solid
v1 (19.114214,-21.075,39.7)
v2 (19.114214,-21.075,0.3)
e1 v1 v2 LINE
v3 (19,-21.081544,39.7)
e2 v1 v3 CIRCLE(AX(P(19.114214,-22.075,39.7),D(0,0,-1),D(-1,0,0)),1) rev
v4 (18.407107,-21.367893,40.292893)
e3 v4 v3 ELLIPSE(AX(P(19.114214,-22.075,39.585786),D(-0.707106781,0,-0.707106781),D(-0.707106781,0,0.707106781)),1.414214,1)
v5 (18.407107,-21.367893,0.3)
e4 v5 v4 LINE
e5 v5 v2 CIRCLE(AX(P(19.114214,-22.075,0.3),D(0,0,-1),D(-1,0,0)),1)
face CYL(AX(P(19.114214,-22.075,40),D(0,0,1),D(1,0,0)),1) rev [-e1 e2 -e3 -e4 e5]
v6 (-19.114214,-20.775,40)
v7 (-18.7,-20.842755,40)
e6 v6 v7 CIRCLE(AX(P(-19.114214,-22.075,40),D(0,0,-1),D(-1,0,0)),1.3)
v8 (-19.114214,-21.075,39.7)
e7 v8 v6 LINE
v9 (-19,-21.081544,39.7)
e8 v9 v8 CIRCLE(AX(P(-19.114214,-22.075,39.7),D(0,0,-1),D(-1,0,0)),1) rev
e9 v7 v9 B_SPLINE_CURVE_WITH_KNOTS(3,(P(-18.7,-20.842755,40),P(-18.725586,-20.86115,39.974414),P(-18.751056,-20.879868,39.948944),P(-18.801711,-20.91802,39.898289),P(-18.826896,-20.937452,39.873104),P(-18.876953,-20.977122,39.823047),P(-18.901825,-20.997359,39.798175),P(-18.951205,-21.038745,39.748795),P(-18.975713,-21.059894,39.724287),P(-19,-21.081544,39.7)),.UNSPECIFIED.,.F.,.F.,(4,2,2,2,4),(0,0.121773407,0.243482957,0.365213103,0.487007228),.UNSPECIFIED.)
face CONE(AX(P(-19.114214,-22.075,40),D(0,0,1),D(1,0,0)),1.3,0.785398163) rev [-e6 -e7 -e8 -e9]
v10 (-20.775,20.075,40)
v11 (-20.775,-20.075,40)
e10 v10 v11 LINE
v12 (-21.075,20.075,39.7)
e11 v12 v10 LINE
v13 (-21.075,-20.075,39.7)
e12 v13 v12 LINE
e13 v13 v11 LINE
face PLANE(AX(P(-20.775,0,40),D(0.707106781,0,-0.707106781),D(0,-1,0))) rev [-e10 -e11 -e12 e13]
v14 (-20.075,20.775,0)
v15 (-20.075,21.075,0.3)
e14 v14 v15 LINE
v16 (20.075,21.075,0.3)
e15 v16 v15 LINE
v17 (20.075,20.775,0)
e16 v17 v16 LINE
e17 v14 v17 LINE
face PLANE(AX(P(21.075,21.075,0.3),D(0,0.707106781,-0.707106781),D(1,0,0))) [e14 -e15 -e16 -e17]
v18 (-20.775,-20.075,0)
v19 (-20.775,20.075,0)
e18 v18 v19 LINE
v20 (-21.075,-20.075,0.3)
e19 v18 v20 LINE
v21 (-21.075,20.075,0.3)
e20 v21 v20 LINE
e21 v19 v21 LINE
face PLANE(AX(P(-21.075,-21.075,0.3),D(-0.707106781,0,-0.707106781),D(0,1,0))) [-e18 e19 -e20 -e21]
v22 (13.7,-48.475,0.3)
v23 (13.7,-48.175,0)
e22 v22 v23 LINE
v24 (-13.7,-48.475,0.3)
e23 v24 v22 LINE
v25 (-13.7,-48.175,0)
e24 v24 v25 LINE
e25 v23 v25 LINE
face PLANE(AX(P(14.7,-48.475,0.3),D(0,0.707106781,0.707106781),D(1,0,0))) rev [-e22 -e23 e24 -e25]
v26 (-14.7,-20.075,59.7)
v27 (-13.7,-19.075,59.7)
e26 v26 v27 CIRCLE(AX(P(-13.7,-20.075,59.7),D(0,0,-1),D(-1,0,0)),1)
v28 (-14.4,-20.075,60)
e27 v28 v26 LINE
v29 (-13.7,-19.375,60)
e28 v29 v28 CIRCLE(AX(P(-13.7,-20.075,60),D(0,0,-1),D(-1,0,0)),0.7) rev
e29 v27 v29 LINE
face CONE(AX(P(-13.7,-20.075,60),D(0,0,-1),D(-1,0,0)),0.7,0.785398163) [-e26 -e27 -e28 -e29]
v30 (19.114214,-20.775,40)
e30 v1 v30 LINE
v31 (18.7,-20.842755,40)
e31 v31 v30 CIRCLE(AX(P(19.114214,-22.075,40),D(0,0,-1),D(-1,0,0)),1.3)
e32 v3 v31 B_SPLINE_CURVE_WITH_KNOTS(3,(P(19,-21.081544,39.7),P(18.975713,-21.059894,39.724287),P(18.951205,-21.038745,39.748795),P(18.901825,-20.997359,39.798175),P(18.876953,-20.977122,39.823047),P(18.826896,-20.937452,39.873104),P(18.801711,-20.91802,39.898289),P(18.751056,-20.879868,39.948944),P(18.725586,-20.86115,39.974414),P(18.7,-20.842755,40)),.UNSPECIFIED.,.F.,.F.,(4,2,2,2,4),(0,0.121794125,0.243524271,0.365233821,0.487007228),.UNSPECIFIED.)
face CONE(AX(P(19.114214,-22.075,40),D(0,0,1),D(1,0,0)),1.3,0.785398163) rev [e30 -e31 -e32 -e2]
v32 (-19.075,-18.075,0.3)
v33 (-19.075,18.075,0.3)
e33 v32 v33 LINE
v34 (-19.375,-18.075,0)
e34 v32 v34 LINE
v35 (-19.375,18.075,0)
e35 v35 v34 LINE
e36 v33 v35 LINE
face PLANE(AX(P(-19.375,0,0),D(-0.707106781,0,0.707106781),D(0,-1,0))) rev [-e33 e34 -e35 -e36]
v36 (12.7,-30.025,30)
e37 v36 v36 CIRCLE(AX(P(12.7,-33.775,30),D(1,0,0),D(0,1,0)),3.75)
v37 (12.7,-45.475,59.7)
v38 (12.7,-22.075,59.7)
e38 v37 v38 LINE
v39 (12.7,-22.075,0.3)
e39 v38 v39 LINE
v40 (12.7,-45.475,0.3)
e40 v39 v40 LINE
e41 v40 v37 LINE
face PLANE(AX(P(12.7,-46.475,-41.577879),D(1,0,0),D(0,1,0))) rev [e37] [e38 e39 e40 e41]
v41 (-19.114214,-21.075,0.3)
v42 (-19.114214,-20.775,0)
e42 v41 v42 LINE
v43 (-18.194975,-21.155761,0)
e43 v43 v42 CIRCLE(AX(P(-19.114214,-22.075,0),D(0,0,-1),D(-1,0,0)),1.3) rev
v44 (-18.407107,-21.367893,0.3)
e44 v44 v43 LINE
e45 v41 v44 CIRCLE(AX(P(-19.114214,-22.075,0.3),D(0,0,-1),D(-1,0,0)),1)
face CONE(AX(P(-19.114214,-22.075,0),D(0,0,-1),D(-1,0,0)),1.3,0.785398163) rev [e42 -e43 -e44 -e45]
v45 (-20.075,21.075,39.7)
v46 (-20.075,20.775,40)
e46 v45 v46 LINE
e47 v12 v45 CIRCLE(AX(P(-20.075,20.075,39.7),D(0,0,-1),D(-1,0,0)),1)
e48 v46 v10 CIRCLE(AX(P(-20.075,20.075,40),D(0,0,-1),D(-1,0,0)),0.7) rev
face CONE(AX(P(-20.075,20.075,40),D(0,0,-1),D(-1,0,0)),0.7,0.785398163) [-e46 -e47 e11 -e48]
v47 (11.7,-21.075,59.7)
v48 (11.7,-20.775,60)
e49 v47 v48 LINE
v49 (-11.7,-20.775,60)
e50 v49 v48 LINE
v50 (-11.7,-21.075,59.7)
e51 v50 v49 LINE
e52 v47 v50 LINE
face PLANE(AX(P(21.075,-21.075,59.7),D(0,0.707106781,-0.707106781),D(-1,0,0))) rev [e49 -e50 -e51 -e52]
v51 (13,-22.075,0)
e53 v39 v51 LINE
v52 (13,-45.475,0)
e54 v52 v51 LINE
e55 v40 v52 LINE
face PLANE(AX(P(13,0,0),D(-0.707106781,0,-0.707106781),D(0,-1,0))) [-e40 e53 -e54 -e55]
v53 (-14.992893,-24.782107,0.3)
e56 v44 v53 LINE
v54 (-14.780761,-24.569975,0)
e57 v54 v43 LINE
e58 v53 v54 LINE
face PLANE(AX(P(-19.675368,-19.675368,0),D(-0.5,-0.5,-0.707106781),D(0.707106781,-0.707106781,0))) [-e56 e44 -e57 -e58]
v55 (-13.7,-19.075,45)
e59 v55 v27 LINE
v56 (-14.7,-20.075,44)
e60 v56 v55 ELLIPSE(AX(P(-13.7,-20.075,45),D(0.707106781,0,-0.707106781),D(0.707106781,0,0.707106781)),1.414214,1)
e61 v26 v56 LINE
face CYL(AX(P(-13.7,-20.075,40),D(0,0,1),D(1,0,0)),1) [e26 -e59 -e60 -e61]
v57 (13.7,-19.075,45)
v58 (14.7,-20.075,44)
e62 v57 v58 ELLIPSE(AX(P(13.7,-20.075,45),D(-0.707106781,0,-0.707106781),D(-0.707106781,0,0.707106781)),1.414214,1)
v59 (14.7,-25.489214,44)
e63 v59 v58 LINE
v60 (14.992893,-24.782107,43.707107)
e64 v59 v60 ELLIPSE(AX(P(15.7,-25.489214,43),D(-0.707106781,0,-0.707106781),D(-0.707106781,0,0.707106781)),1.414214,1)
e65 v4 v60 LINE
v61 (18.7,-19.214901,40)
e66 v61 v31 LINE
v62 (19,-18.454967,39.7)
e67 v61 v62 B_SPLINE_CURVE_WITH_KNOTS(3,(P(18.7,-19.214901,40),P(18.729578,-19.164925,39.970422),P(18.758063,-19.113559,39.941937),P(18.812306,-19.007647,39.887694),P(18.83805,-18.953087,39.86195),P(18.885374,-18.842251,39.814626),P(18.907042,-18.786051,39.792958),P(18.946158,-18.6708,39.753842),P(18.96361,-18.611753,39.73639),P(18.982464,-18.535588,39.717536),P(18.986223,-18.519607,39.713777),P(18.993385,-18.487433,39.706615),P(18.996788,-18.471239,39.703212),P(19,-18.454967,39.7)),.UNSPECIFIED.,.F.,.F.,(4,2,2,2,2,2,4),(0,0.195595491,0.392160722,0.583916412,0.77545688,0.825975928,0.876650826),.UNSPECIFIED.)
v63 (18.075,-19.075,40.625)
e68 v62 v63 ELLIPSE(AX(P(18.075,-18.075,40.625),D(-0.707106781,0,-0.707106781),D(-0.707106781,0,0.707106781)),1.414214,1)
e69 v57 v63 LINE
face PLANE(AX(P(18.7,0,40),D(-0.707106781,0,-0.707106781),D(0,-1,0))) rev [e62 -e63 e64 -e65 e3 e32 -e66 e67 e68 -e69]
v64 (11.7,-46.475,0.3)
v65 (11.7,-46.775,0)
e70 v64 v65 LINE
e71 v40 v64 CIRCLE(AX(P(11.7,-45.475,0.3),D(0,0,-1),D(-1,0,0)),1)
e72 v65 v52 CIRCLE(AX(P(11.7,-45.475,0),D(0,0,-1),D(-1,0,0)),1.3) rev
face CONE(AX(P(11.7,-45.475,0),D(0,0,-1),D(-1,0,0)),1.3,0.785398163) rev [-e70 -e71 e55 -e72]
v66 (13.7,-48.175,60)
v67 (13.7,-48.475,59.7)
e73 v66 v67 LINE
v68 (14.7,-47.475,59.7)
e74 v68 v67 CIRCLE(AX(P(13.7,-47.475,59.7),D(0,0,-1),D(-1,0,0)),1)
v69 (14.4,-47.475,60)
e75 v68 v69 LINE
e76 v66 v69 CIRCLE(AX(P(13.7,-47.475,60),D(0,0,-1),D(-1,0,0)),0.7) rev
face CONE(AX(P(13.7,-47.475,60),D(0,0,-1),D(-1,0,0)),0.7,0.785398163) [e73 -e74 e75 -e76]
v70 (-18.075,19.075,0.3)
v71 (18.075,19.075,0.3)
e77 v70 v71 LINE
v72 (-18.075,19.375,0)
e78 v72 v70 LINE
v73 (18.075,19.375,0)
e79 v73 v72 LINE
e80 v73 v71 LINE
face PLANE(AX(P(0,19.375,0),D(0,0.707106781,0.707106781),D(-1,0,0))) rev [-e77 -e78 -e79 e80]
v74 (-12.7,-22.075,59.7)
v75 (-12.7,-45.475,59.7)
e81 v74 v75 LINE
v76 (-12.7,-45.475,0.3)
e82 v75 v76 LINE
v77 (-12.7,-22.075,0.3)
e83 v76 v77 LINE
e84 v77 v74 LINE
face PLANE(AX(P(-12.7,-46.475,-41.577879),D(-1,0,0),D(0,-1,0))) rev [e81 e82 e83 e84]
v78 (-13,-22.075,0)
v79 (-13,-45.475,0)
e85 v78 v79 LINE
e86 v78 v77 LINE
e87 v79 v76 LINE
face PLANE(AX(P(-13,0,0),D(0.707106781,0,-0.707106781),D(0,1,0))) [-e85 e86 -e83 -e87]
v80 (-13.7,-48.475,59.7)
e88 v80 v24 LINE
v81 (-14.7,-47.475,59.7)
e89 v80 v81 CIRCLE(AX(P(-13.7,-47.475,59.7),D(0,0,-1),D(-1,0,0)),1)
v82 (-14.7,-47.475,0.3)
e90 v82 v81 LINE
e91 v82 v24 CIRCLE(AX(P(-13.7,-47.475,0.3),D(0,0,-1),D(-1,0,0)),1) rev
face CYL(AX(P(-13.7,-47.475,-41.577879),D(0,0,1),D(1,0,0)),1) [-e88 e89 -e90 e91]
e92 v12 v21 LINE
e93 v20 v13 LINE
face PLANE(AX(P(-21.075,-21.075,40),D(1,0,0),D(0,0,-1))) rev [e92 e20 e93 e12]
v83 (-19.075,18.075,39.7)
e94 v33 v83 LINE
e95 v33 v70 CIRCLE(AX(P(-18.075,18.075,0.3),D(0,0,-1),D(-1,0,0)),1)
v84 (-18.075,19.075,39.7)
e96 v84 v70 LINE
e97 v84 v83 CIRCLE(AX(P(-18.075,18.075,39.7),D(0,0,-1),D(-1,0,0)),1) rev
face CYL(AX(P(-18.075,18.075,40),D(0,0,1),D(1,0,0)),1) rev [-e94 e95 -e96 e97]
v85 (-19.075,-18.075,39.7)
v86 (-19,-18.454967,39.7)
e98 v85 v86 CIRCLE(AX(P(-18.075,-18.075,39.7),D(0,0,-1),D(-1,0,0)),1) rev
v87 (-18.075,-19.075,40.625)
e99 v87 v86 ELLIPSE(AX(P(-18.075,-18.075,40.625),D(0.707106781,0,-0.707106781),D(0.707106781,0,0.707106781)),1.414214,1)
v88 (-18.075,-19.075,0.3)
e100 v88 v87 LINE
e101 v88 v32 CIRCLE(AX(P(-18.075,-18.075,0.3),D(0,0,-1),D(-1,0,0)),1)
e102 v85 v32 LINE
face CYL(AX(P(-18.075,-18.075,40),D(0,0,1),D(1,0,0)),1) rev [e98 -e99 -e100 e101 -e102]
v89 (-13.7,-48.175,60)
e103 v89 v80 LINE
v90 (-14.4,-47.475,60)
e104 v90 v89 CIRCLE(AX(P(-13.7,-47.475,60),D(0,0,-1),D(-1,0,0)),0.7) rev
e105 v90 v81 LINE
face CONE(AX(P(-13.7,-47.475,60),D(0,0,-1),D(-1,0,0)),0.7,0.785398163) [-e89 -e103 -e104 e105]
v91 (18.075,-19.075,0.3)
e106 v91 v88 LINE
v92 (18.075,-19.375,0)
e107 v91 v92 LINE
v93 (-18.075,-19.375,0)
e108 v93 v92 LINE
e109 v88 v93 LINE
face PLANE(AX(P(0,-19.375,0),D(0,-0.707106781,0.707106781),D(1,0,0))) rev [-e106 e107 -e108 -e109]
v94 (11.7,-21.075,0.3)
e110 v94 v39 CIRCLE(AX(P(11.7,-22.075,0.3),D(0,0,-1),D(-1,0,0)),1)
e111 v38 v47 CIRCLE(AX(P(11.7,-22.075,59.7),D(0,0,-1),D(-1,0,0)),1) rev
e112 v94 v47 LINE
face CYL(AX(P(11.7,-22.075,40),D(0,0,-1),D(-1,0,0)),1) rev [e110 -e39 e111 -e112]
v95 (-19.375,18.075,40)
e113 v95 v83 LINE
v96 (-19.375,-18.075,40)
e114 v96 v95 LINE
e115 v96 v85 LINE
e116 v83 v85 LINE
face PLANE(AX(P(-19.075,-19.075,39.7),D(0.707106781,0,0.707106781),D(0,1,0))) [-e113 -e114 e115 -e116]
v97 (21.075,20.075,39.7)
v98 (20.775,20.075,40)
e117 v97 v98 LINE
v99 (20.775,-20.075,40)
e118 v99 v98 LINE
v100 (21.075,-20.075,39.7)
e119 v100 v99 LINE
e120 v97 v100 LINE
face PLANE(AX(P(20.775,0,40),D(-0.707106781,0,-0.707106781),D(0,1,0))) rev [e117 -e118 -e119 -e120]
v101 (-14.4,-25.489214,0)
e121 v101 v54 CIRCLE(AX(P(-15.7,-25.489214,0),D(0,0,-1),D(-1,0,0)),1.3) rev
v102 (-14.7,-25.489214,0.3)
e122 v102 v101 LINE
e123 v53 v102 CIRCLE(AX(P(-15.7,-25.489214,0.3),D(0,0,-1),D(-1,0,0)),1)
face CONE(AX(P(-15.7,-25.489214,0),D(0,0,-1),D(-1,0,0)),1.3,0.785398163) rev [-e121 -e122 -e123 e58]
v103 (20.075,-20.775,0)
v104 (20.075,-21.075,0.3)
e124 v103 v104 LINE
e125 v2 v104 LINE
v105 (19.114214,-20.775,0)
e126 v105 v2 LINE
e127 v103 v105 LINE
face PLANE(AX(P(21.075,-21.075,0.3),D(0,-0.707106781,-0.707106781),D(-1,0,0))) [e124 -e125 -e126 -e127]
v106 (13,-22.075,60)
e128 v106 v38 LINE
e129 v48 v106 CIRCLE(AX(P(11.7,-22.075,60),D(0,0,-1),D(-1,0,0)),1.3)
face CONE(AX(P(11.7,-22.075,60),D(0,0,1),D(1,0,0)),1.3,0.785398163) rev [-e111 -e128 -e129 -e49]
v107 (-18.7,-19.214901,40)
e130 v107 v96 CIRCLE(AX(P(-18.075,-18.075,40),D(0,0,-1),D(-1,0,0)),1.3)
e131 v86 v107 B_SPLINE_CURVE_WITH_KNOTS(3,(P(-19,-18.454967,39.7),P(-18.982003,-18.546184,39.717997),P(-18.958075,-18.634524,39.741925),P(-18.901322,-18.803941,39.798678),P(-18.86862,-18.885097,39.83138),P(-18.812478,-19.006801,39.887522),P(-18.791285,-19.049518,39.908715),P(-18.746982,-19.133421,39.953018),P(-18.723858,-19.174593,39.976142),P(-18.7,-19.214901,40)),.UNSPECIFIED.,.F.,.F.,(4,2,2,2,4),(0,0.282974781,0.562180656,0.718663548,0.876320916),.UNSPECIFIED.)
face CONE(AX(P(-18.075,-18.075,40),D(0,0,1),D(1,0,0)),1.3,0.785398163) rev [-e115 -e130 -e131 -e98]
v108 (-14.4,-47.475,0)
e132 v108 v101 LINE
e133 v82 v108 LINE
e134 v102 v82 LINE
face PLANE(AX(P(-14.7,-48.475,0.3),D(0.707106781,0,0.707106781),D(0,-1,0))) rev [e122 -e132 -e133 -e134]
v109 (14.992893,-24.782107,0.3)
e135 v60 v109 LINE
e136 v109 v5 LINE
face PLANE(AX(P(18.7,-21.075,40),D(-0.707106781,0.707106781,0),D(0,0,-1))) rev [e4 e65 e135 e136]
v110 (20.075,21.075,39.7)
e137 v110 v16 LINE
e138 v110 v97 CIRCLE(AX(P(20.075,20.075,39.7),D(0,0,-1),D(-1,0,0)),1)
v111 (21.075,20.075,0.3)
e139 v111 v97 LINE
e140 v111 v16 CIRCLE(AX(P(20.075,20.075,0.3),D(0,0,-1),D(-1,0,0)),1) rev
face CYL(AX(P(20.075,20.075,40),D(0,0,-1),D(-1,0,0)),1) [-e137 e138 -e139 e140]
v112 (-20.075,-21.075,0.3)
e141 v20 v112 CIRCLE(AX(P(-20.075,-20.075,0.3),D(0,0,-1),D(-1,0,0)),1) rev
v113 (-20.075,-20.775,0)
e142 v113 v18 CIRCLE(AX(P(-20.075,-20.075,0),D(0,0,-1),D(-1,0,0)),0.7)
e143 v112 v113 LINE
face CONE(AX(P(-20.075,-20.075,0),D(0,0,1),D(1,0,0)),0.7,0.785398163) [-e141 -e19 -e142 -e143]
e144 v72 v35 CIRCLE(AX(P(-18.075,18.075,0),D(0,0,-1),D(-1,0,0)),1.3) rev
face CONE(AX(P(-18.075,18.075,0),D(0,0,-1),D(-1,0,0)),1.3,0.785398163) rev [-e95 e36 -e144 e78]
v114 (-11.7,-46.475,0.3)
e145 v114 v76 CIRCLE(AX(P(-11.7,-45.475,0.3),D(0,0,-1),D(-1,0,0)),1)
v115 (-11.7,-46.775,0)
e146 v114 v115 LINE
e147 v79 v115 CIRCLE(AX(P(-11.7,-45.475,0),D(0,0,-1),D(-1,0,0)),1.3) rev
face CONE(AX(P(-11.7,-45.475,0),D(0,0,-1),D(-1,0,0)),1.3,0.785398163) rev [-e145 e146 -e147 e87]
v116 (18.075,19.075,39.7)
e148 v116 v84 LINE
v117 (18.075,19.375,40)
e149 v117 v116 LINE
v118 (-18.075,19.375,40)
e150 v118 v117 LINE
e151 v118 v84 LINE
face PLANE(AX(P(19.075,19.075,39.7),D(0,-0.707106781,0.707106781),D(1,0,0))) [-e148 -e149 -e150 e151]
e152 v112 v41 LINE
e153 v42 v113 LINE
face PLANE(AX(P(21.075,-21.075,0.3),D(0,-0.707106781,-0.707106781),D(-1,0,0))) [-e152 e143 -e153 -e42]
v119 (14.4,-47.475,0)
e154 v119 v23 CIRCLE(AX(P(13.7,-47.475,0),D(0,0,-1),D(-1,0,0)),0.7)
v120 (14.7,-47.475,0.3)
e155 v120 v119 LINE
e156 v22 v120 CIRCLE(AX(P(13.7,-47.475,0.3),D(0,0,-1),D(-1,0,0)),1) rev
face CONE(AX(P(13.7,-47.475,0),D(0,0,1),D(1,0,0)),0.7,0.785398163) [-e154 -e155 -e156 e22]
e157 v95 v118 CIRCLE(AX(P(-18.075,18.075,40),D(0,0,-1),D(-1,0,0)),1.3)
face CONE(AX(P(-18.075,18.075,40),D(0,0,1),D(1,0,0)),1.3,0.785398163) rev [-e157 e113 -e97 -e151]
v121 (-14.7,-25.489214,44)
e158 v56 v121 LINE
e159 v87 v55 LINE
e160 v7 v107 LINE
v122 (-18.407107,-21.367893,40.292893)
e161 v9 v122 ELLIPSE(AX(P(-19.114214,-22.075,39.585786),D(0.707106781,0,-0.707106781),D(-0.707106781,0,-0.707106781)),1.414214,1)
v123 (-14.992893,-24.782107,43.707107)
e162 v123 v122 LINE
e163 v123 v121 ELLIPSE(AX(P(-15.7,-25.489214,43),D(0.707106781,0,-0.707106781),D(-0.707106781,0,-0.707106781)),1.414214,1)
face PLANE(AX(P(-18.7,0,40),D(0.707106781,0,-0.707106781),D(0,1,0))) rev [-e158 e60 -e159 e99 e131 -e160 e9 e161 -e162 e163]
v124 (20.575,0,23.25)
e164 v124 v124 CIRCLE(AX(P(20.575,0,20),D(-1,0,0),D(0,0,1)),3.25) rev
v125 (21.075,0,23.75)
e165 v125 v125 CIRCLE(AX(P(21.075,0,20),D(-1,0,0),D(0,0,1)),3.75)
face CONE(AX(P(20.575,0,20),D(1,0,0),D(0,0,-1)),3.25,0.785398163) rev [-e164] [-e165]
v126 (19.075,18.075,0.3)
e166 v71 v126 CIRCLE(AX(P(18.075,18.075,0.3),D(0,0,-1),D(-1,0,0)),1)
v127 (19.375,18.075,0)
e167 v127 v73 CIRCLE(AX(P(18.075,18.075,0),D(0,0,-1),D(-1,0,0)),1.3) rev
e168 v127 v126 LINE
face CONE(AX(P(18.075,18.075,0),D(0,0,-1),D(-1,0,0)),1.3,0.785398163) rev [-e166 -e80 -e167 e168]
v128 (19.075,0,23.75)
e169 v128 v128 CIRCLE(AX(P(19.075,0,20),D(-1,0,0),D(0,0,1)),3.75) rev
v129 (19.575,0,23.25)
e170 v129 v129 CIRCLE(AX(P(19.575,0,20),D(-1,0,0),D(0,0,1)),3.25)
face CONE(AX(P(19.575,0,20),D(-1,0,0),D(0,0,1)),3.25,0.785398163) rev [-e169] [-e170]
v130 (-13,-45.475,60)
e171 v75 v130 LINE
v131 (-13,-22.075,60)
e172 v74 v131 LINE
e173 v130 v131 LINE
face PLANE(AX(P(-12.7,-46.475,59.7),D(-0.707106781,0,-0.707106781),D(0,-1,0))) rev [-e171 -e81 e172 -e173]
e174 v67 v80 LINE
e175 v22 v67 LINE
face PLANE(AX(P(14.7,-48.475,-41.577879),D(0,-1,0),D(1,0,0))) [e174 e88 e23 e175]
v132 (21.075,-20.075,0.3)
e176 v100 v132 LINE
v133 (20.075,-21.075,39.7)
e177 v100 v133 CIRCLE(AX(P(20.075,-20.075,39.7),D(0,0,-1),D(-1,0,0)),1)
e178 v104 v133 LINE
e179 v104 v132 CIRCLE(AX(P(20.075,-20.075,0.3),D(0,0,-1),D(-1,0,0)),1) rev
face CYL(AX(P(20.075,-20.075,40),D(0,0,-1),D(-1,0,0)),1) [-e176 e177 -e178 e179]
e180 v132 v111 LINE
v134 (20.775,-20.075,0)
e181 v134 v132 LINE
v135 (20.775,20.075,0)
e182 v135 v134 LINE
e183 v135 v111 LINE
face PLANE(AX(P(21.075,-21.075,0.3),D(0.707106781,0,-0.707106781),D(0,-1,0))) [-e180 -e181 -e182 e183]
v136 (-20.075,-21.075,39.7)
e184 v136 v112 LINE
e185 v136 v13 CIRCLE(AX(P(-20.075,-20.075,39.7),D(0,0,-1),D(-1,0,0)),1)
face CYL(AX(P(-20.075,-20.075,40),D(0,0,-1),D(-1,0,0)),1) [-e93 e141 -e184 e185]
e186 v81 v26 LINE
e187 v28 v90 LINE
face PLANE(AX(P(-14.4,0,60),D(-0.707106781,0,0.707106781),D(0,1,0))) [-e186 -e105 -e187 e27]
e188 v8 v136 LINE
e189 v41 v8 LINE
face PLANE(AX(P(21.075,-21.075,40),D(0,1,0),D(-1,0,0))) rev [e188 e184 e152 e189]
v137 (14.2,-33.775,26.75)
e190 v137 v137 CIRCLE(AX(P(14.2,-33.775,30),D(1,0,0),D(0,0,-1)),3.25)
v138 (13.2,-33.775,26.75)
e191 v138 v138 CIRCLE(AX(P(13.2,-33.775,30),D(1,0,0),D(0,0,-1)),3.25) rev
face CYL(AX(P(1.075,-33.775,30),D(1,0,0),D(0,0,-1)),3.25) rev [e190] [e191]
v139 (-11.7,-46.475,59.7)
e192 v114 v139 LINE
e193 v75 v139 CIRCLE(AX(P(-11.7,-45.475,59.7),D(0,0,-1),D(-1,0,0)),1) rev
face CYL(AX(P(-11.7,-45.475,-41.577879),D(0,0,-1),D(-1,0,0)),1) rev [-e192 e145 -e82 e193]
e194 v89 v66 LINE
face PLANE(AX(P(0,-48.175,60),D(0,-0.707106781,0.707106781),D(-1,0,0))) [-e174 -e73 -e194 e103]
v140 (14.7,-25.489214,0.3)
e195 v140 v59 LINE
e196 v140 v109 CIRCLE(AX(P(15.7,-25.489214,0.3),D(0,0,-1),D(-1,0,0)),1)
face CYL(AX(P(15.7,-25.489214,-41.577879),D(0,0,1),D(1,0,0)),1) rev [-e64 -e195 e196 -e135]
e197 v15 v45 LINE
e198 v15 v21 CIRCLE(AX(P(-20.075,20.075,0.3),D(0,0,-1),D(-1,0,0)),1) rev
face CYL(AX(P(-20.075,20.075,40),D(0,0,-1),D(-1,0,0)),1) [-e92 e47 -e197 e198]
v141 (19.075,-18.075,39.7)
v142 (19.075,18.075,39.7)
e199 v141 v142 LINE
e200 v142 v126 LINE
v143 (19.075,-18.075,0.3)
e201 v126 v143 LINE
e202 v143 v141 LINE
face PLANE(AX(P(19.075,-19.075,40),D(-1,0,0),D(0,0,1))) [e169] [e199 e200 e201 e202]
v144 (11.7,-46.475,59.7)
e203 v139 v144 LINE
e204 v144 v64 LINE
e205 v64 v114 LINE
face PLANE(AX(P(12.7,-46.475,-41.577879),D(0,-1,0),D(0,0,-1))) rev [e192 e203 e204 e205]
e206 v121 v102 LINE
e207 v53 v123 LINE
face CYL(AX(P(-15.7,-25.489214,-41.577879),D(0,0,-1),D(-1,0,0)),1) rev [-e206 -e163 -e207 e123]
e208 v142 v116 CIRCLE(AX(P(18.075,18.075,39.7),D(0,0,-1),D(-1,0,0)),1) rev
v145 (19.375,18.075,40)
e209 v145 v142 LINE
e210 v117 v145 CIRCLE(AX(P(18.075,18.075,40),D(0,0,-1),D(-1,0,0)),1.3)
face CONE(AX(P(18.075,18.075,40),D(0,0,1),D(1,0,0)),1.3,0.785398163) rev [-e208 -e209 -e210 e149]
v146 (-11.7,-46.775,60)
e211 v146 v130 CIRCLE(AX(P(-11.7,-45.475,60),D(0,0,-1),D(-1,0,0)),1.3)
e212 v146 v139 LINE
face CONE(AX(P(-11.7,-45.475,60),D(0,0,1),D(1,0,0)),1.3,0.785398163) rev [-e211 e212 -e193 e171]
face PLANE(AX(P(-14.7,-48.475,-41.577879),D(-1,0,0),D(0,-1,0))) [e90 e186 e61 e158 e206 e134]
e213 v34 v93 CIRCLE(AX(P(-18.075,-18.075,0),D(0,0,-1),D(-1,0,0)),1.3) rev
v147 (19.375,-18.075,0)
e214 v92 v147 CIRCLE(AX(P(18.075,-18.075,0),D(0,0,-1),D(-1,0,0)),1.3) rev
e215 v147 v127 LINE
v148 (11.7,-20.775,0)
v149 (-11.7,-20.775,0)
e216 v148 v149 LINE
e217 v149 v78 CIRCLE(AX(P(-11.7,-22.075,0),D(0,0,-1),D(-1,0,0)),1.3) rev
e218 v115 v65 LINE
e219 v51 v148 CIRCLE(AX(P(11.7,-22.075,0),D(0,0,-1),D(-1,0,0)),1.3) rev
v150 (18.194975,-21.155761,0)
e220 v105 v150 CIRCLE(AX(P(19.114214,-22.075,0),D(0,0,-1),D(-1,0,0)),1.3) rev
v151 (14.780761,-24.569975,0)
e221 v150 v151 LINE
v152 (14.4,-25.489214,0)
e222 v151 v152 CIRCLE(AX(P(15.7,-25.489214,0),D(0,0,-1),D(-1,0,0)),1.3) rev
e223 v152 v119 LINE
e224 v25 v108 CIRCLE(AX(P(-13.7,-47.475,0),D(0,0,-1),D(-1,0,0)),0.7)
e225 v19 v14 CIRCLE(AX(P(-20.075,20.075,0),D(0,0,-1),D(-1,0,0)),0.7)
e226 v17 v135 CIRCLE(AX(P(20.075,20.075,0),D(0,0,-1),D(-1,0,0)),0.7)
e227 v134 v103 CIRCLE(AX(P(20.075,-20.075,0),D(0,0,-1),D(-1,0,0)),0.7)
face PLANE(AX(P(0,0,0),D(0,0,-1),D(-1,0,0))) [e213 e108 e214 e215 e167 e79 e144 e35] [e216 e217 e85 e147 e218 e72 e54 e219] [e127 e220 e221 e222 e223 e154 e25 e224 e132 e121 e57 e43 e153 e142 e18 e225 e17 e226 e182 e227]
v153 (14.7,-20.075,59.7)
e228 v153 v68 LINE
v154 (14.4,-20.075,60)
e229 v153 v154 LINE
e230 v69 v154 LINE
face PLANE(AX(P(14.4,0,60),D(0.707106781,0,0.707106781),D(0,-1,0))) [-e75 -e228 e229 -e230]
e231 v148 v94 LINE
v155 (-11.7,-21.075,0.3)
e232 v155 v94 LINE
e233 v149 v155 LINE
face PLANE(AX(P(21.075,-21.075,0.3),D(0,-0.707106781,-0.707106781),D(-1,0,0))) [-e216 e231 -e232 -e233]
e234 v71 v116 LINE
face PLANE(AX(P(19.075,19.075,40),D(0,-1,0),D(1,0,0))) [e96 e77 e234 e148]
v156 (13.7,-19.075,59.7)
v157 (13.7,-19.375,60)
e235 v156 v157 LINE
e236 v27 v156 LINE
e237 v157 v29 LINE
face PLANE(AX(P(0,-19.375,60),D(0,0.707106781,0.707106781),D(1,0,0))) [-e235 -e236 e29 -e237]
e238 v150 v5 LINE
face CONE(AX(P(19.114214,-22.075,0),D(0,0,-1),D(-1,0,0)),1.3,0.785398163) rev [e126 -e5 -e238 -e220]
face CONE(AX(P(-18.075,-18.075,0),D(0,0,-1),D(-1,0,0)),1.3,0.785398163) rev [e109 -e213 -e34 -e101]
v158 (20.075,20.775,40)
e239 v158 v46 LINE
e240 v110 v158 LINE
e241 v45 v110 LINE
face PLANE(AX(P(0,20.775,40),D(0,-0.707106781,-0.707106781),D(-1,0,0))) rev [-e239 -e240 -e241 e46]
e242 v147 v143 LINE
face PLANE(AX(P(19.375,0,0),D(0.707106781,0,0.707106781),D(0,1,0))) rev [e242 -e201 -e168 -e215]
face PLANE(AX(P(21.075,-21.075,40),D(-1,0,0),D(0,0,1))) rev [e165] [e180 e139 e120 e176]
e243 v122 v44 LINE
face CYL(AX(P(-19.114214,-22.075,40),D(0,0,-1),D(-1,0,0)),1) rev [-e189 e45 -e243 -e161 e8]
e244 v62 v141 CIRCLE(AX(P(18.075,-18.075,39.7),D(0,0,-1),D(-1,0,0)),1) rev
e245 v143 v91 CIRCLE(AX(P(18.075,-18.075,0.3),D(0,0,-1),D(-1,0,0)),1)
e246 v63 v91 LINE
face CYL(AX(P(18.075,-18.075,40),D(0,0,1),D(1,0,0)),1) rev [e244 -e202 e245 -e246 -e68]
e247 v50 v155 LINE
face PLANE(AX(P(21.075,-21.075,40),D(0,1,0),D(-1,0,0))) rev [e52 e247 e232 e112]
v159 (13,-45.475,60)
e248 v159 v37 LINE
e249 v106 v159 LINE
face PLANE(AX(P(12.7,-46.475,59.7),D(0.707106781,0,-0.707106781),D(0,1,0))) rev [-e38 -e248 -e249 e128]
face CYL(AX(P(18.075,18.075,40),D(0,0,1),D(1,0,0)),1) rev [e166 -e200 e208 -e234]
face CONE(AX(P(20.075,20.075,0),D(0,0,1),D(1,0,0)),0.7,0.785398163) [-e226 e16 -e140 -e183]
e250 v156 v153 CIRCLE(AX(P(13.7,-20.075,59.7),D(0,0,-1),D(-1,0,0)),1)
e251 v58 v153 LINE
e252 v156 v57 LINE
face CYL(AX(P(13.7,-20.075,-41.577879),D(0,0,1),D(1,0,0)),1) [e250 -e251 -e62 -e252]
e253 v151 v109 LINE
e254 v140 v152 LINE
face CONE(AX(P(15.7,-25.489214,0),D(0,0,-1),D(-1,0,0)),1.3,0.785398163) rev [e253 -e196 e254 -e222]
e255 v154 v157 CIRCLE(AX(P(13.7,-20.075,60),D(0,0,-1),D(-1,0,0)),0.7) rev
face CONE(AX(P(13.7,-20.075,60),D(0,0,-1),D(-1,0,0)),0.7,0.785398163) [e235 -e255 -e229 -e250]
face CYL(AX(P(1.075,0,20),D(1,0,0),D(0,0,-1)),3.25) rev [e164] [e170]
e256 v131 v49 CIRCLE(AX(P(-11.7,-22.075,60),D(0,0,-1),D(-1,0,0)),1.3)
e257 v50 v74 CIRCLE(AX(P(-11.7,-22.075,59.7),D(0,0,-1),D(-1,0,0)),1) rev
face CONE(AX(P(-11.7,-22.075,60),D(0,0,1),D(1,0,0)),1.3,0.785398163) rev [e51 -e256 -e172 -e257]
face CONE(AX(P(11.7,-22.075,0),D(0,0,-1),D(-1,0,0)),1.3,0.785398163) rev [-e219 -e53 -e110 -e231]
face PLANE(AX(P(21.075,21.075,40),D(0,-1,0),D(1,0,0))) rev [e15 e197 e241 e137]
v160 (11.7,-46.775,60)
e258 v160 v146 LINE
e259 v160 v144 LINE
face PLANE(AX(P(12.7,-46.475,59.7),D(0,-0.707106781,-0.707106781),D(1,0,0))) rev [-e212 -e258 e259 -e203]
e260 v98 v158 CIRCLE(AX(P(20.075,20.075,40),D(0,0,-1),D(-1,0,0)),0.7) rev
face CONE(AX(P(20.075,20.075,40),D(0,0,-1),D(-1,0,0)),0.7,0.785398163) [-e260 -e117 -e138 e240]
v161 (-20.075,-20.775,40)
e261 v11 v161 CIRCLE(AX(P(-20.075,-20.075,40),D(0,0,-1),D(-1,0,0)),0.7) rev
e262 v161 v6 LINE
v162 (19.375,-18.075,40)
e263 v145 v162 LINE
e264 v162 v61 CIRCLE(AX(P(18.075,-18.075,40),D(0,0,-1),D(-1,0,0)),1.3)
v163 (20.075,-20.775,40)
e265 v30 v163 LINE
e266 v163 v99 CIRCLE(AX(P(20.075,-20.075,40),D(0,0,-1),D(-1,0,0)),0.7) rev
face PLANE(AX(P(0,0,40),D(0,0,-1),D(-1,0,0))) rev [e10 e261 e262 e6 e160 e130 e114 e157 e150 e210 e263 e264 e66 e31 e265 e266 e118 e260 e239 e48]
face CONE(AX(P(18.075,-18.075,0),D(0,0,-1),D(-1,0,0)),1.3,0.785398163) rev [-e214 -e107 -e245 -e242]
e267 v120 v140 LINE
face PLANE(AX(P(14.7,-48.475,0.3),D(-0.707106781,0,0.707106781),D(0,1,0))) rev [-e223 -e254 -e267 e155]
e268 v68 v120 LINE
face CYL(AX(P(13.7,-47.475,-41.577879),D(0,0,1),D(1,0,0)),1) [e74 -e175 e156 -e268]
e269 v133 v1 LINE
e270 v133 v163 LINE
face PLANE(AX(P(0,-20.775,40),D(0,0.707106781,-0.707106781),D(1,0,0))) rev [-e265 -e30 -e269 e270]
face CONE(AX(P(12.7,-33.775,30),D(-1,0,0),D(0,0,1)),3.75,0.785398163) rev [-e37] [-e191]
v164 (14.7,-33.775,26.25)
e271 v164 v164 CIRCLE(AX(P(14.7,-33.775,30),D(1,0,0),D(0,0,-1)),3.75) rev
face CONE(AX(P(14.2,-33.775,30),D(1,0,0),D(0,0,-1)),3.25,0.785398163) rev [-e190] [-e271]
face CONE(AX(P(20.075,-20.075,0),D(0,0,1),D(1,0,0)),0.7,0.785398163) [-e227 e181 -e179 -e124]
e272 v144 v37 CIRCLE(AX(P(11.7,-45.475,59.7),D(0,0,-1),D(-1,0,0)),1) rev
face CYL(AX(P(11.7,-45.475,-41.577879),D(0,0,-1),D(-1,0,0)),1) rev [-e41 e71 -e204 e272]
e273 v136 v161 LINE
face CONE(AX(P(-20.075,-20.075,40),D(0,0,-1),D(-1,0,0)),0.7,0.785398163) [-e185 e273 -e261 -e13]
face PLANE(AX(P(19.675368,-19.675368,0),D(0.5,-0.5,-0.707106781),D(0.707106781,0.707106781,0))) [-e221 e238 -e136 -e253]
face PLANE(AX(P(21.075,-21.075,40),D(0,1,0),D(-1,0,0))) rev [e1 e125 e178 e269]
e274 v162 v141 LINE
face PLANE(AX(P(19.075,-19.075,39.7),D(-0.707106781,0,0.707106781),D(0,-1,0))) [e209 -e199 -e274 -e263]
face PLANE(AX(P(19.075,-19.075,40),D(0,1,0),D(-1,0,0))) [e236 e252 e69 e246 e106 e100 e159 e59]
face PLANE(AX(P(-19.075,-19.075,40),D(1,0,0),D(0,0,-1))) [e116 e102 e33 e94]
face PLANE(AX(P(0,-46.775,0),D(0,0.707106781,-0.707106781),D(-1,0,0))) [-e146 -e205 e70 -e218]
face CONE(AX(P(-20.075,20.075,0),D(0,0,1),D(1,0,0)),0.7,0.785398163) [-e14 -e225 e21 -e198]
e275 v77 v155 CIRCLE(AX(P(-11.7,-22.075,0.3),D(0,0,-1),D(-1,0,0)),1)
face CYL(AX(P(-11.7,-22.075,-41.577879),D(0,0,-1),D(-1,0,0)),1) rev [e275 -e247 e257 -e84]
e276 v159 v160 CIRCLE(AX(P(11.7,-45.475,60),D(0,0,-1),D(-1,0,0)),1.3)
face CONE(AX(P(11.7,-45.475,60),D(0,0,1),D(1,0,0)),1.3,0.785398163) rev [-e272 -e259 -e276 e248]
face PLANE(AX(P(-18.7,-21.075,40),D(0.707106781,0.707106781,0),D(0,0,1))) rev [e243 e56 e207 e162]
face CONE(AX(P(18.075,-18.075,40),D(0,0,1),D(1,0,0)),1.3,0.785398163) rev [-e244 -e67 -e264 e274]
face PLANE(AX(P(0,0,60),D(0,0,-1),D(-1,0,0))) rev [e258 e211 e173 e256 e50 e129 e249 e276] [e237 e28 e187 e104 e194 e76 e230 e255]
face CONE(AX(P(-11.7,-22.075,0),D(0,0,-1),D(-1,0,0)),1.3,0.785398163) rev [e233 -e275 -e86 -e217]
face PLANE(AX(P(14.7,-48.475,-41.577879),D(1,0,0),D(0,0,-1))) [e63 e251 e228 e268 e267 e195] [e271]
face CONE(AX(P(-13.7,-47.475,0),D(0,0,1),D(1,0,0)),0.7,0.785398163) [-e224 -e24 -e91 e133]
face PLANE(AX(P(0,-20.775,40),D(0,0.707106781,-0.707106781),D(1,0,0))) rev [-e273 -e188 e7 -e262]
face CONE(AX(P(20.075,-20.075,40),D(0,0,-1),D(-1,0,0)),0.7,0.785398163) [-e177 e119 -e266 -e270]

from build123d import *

# Parameters (mm, degrees)
SKETCH1_W           = 42.15
SKETCH1_H           = 42.15
SKETCH1_W_2         = 38.15
SKETCH1_H_2         = 38.15
BOSS_EXTRUDE1_DEPTH = 40
BOSS_EXTRUDE2_START = -40
SKETCH3_W           = 29.4
SKETCH3_H           = 29.4
SKETCH3_W_2         = 25.4
SKETCH3_H_2         = 25.4
BOSS_EXTRUDE2_DEPTH = 60
CHAMFER1_SIZE       = 4
FILLET1_R           = 1
CHAMFER2_SIZE       = 0.3
SKETCH6_R           = 3.25
CUT_EXTRUDE1_DEPTH  = 20
CHAMFER3_SIZE       = 0.5


with BuildPart() as part:
    # Sketch1 → Boss-Extrude1 (new body)
    with BuildSketch(Plane.XY):
        Rectangle(SKETCH1_W, SKETCH1_H)
        Rectangle(SKETCH1_W_2, SKETCH1_H_2, mode=Mode.SUBTRACT)
    extrude(amount=BOSS_EXTRUDE1_DEPTH)

    # Sketch3 → Boss-Extrude2 (add)
    with BuildSketch(Plane.XY.offset(40).offset(BOSS_EXTRUDE2_START)):
        with Locations((0, -33.775)):
            Rectangle(SKETCH3_W, SKETCH3_H)
        with Locations((0, -33.775)):
            Rectangle(SKETCH3_W_2, SKETCH3_H_2, mode=Mode.SUBTRACT)
    extrude(amount=BOSS_EXTRUDE2_DEPTH)

    # Chamfer1
    chamfer1_edges = [part.edges().sort_by_distance(p)[0] for p in [
        (-14.7, -21.075, 20),
        (-14.7, -20.075, 40),
        (14.7, -20.075, 40),
        (14.7, -21.075, 20),
    ]]
    chamfer(chamfer1_edges, length=CHAMFER1_SIZE)

    # Fillet1
    # the kernel refuses this fillet: 1 mm, written as the material it adds along each edge
    with BuildSketch(Plane(origin=(-18.7, -21.075, 41.035533906), x_dir=(-1, 0, 0), z_dir=(0, 0, -1))) as fillet1_piece_1_section:
        with BuildLine():
            CenterArc((FILLET1_R * 0.414213562373, -FILLET1_R), FILLET1_R, 90, 45)
            Line((-FILLET1_R * 0.292893218813, -FILLET1_R * 0.292893218813), (0, 0))
            Line((0, 0), (FILLET1_R * 0.414213562373, 0))
        make_face()
    fillet1_piece_1 = extrude(amount=41.035533906, mode=Mode.PRIVATE)
    fillet1_piece_1 = split(fillet1_piece_1, bisect_by=Plane(origin=(-18.52848767, -21.244019164, 40), z_dir=(0, 0, 1)), keep=Keep.TOP, mode=Mode.PRIVATE)
    fillet1_piece_1 = split(fillet1_piece_1, bisect_by=Plane(origin=(-18.571365753, -21.244019164, 40.128634247), z_dir=(0.7071067811865476, 0, -0.7071067811865476)), keep=Keep.TOP, mode=Mode.PRIVATE)
    add(fillet1_piece_1)
    with BuildSketch(Plane(origin=(-18.7, -21.075, 40), x_dir=(-1, 0, 0), z_dir=(0, 0, -1))) as fillet1_piece_2_section:
        with BuildLine():
            CenterArc((FILLET1_R * 0.414213562373, -FILLET1_R), FILLET1_R, 90, 45)
            Line((-FILLET1_R * 0.292893218813, -FILLET1_R * 0.292893218813), (0, 0))
            Line((0, 0), (FILLET1_R * 0.414213562373, 0))
        make_face()
    fillet1_piece_2 = extrude(amount=40, mode=Mode.PRIVATE)
    fillet1_piece_2 = split(fillet1_piece_2, bisect_by=Plane(origin=(-18.871940498, -21.07666124, 39.828059502), z_dir=(-0.7071067811865476, 0, 0.7071067811865476)), keep=Keep.TOP, mode=Mode.PRIVATE)
    add(fillet1_piece_2)
    with BuildSketch(Plane(origin=(-18.7, -21.075, 40), x_dir=(-1, 0, 0), z_dir=(0, 0, -1))) as fillet1_piece_3_section:
        with BuildLine():
            CenterArc((FILLET1_R * 0.414213562373, -FILLET1_R), FILLET1_R, 90, 45)
            Line((-FILLET1_R * 0.292893218813, -FILLET1_R * 0.292893218813), (0, 0))
            Line((0, 0), (FILLET1_R * 0.414213562373, 0))
        make_face()
    fillet1_piece_3 = extrude(amount=40, mode=Mode.PRIVATE)
    fillet1_piece_3 = split(fillet1_piece_3, bisect_by=Plane(origin=(-28.731905548, -21.13692691, 29.968094452), z_dir=(0.7071067811865476, 0, -0.7071067811865476)), keep=Keep.TOP, mode=Mode.PRIVATE)
    add(fillet1_piece_3)
    with BuildSketch(Plane(origin=(-14.7, -25.075, 45.035533906), x_dir=(-0.7071067811865476, 0.7071067811865476, 0), z_dir=(0, 0, -1))) as fillet1_piece_4_section:
        with BuildLine():
            CenterArc((FILLET1_R * 0.414213562373, -FILLET1_R), FILLET1_R, 90, 45)
            Line((-FILLET1_R * 0.292893218813, -FILLET1_R * 0.292893218813), (0, 0))
            Line((0, 0), (FILLET1_R * 0.414213562373, 0))
        make_face()
    fillet1_piece_4 = extrude(amount=45.035533906, mode=Mode.PRIVATE)
    fillet1_piece_4 = split(fillet1_piece_4, bisect_by=Plane(origin=(-25.746262665, -25.100835331, 32.953737335), z_dir=(0.7071067811865476, 0, -0.7071067811865476)), keep=Keep.TOP, mode=Mode.PRIVATE)
    add(fillet1_piece_4)
    with BuildSketch(Plane(origin=(14.7, -25.075, 0), x_dir=(0, -1, 0), z_dir=(0, 0, 1))) as fillet1_piece_5_section:
        with BuildLine():
            CenterArc((FILLET1_R * 0.414213562373, FILLET1_R), FILLET1_R, 225, 45)
            Line((-FILLET1_R * 0.292893218813, FILLET1_R * 0.292893218813), (0, 0))
            Line((0, 0), (FILLET1_R * 0.414213562373, 0))
        make_face()
    fillet1_piece_5 = extrude(amount=45.035533906, mode=Mode.PRIVATE)
    fillet1_piece_5 = split(fillet1_piece_5, bisect_by=Plane(origin=(25.746262665, -25.100835331, 32.953737335), z_dir=(-0.7071067811865476, 0, -0.7071067811865476)), keep=Keep.TOP, mode=Mode.PRIVATE)
    add(fillet1_piece_5)
    with BuildSketch(Plane(origin=(18.7, -21.075, 0), x_dir=(1, 0, 0), z_dir=(0, 0, 1))) as fillet1_piece_6_section:
        with BuildLine():
            CenterArc((FILLET1_R * 0.414213562373, -FILLET1_R), FILLET1_R, 90, 45)
            Line((-FILLET1_R * 0.292893218813, -FILLET1_R * 0.292893218813), (0, 0))
            Line((0, 0), (FILLET1_R * 0.414213562373, 0))
        make_face()
    fillet1_piece_6 = extrude(amount=40, mode=Mode.PRIVATE)
    fillet1_piece_6 = split(fillet1_piece_6, bisect_by=Plane(origin=(28.731905548, -21.13692691, 29.968094452), z_dir=(-0.7071067811865476, 0, -0.7071067811865476)), keep=Keep.TOP, mode=Mode.PRIVATE)
    add(fillet1_piece_6)
    with BuildSketch(Plane(origin=(18.7, -21.075, 0), x_dir=(1, 0, 0), z_dir=(0, 0, 1))) as fillet1_piece_7_section:
        with BuildLine():
            CenterArc((FILLET1_R * 0.414213562373, -FILLET1_R), FILLET1_R, 90, 45)
            Line((-FILLET1_R * 0.292893218813, -FILLET1_R * 0.292893218813), (0, 0))
            Line((0, 0), (FILLET1_R * 0.414213562373, 0))
        make_face()
    fillet1_piece_7 = extrude(amount=41.035533906, mode=Mode.PRIVATE)
    fillet1_piece_7 = split(fillet1_piece_7, bisect_by=Plane(origin=(18.52848767, -21.244019164, 40), z_dir=(0, 0, 1)), keep=Keep.TOP, mode=Mode.PRIVATE)
    fillet1_piece_7 = split(fillet1_piece_7, bisect_by=Plane(origin=(18.571365753, -21.244019164, 40.128634247), z_dir=(-0.7071067811865476, 0, -0.7071067811865476)), keep=Keep.TOP, mode=Mode.PRIVATE)
    add(fillet1_piece_7)
    with BuildSketch(Plane(origin=(18.7, -21.075, 0), x_dir=(1, 0, 0), z_dir=(0, 0, 1))) as fillet1_piece_8_section:
        with BuildLine():
            CenterArc((FILLET1_R * 0.414213562373, -FILLET1_R), FILLET1_R, 90, 45)
            Line((-FILLET1_R * 0.292893218813, -FILLET1_R * 0.292893218813), (0, 0))
            Line((0, 0), (FILLET1_R * 0.414213562373, 0))
        make_face()
    fillet1_piece_8 = extrude(amount=40, mode=Mode.PRIVATE)
    fillet1_piece_8 = split(fillet1_piece_8, bisect_by=Plane(origin=(18.871940498, -21.07666124, 39.828059502), z_dir=(0.7071067811865476, 0, 0.7071067811865476)), keep=Keep.TOP, mode=Mode.PRIVATE)
    add(fillet1_piece_8)
    with BuildSketch(Plane(origin=(12.7, -46.475, 0), x_dir=(-1, 0, 0), z_dir=(0, 0, 1)), Plane(origin=(-12.7, -46.475, 0), x_dir=(0, 1, 0), z_dir=(0, 0, 1))) as fillet1_piece_9:
        with BuildLine():
            CenterArc((FILLET1_R, -FILLET1_R), FILLET1_R, 90, 90)
            Line((0, -FILLET1_R), (0, 0))
            Line((0, 0), (FILLET1_R, 0))
        make_face()
    extrude(amount=60)
    with BuildSketch(Plane(origin=(12.7, -21.075, 0), x_dir=(-1, 0, 0), z_dir=(0, 0, 1)), Plane(origin=(-12.7, -21.075, 60), x_dir=(1, 0, 0), z_dir=(0, 0, -1))) as fillet1_piece_10:
        with BuildLine():
            CenterArc((FILLET1_R, FILLET1_R), FILLET1_R, 180, 90)
            Line((0, FILLET1_R), (0, 0))
            Line((0, 0), (FILLET1_R, 0))
        make_face()
    extrude(amount=60)
    with BuildSketch(Plane(origin=(-19.075, -19.075, 0), x_dir=(1, 0, 0), z_dir=(0, 0, 1))) as fillet1_piece_11_section:
        with BuildLine():
            CenterArc((FILLET1_R, FILLET1_R), FILLET1_R, 180, 90)
            Line((0, FILLET1_R), (0, 0))
            Line((0, 0), (FILLET1_R, 0))
        make_face()
    fillet1_piece_11 = extrude(amount=40, mode=Mode.PRIVATE)
    fillet1_piece_11 = split(fillet1_piece_11, bisect_by=Plane(origin=(-28.821320902, -18.849083106, 29.878679098), z_dir=(0.7071067811865476, 0, -0.7071067811865476)), keep=Keep.TOP, mode=Mode.PRIVATE)
    add(fillet1_piece_11)
    with BuildSketch(Plane(origin=(-19.075, -19.075, 0), x_dir=(1, 0, 0), z_dir=(0, 0, 1))) as fillet1_piece_12_section:
        with BuildLine():
            CenterArc((FILLET1_R, FILLET1_R), FILLET1_R, 180, 90)
            Line((0, FILLET1_R), (0, 0))
            Line((0, 0), (FILLET1_R, 0))
        make_face()
    fillet1_piece_12 = extrude(amount=40, mode=Mode.PRIVATE)
    fillet1_piece_12 = split(fillet1_piece_12, bisect_by=Plane(origin=(-18.920138654, -18.748379017, 39.779861346), z_dir=(-0.7071067811865476, 0, 0.7071067811865476)), keep=Keep.TOP, mode=Mode.PRIVATE)
    add(fillet1_piece_12)
    with BuildSketch(Plane(origin=(-19.075, -19.075, 0), x_dir=(1, 0, 0), z_dir=(0, 0, 1))) as fillet1_piece_13_section:
        with BuildLine():
            CenterArc((FILLET1_R, FILLET1_R), FILLET1_R, 180, 90)
            Line((0, FILLET1_R), (0, 0))
            Line((0, 0), (FILLET1_R, 0))
        make_face()
    fillet1_piece_13 = extrude(amount=42.5, mode=Mode.PRIVATE)
    fillet1_piece_13 = split(fillet1_piece_13, bisect_by=Plane(origin=(-18.390272187, -19.052221158, 40), z_dir=(0, 0, 1)), keep=Keep.TOP, mode=Mode.PRIVATE)
    fillet1_piece_13 = split(fillet1_piece_13, bisect_by=Plane(origin=(-18.467704141, -19.052221158, 40.232295859), z_dir=(0.7071067811865476, 0, -0.7071067811865476)), keep=Keep.TOP, mode=Mode.PRIVATE)
    add(fillet1_piece_13)
    with BuildSketch(Plane(origin=(-19.075, 19.075, 0), x_dir=(0, -1, 0), z_dir=(0, 0, 1)), Plane(origin=(19.075, 19.075, 0), x_dir=(-1, 0, 0), z_dir=(0, 0, 1))) as fillet1_piece_14:
        with BuildLine():
            CenterArc((FILLET1_R, FILLET1_R), FILLET1_R, 180, 90)
            Line((0, FILLET1_R), (0, 0))
            Line((0, 0), (FILLET1_R, 0))
        make_face()
    extrude(amount=40)
    with BuildSketch(Plane(origin=(19.075, -19.075, 0), x_dir=(-1, 0, 0), z_dir=(0, 0, 1))) as fillet1_piece_15_section:
        with BuildLine():
            CenterArc((FILLET1_R, -FILLET1_R), FILLET1_R, 90, 90)
            Line((0, -FILLET1_R), (0, 0))
            Line((0, 0), (FILLET1_R, 0))
        make_face()
    fillet1_piece_15 = extrude(amount=40, mode=Mode.PRIVATE)
    fillet1_piece_15 = split(fillet1_piece_15, bisect_by=Plane(origin=(28.821320902, -18.849083106, 29.878679098), z_dir=(-0.7071067811865476, 0, -0.7071067811865476)), keep=Keep.TOP, mode=Mode.PRIVATE)
    add(fillet1_piece_15)
    with BuildSketch(Plane(origin=(19.075, -19.075, 0), x_dir=(-1, 0, 0), z_dir=(0, 0, 1))) as fillet1_piece_16_section:
        with BuildLine():
            CenterArc((FILLET1_R, -FILLET1_R), FILLET1_R, 90, 90)
            Line((0, -FILLET1_R), (0, 0))
            Line((0, 0), (FILLET1_R, 0))
        make_face()
    fillet1_piece_16 = extrude(amount=40, mode=Mode.PRIVATE)
    fillet1_piece_16 = split(fillet1_piece_16, bisect_by=Plane(origin=(18.920138654, -18.748379017, 39.779861346), z_dir=(0.7071067811865476, 0, 0.7071067811865476)), keep=Keep.TOP, mode=Mode.PRIVATE)
    add(fillet1_piece_16)
    with BuildSketch(Plane(origin=(19.075, -19.075, 0), x_dir=(-1, 0, 0), z_dir=(0, 0, 1))) as fillet1_piece_17_section:
        with BuildLine():
            CenterArc((FILLET1_R, -FILLET1_R), FILLET1_R, 90, 90)
            Line((0, -FILLET1_R), (0, 0))
            Line((0, 0), (FILLET1_R, 0))
        make_face()
    fillet1_piece_17 = extrude(amount=42.5, mode=Mode.PRIVATE)
    fillet1_piece_17 = split(fillet1_piece_17, bisect_by=Plane(origin=(18.390272187, -19.052221158, 40), z_dir=(0, 0, 1)), keep=Keep.TOP, mode=Mode.PRIVATE)
    fillet1_piece_17 = split(fillet1_piece_17, bisect_by=Plane(origin=(18.467704141, -19.052221158, 40.232295859), z_dir=(-0.7071067811865476, 0, -0.7071067811865476)), keep=Keep.TOP, mode=Mode.PRIVATE)
    add(fillet1_piece_17)
    # the kernel refuses this fillet: 1 mm, written as the material it takes off along each edge
    with BuildSketch(Plane(origin=(14.7, -48.475, -2.5), x_dir=(0, 1, 0), z_dir=(0, 0, 1))) as fillet1_2_piece_1:
        with BuildLine():
            CenterArc((FILLET1_R, FILLET1_R), FILLET1_R, 180, 90)
            Line((0, FILLET1_R), (0, 0))
            Line((0, 0), (FILLET1_R, 0))
        make_face()
    extrude(amount=65, mode=Mode.SUBTRACT)
    with BuildSketch(Plane(origin=(-14.7, -48.475, -2.5), x_dir=(0, 1, 0), z_dir=(0, 0, 1))) as fillet1_2_piece_2:
        with BuildLine():
            CenterArc((FILLET1_R, -FILLET1_R), FILLET1_R, 90, 90)
            Line((0, -FILLET1_R), (0, 0))
            Line((0, 0), (FILLET1_R, 0))
        make_face()
    extrude(amount=65, mode=Mode.SUBTRACT)
    with BuildSketch(Plane(origin=(-21.075, -21.075, -2.5), x_dir=(0, 1, 0), z_dir=(0, 0, 1)), Plane(origin=(21.075, -21.075, -2.5), x_dir=(-1, 0, 0), z_dir=(0, 0, 1)), Plane(origin=(21.075, 21.075, -2.5), x_dir=(0, -1, 0), z_dir=(0, 0, 1)), Plane(origin=(-21.075, 21.075, -2.5), x_dir=(1, 0, 0), z_dir=(0, 0, 1))) as fillet1_2_piece_3:
        with BuildLine():
            CenterArc((FILLET1_R, -FILLET1_R), FILLET1_R, 90, 90)
            Line((0, -FILLET1_R), (0, 0))
            Line((0, 0), (FILLET1_R, 0))
        make_face()
    extrude(amount=45, mode=Mode.SUBTRACT)
    with BuildSketch(Plane(origin=(14.7, -19.075, 41.5), x_dir=(-1, 0, 0), z_dir=(0, 0, 1))) as fillet1_2_piece_4_section:
        with BuildLine():
            CenterArc((FILLET1_R, FILLET1_R), FILLET1_R, 180, 90)
            Line((0, FILLET1_R), (0, 0))
            Line((0, 0), (FILLET1_R, 0))
        make_face()
    fillet1_2_piece_4 = extrude(amount=21, mode=Mode.PRIVATE)
    fillet1_2_piece_4 = split(fillet1_2_piece_4, bisect_by=Plane(origin=(9.907111196, -19.302897648, 48.792888804), z_dir=(0.7071067811865476, 0, 0.7071067811865476)), keep=Keep.TOP, mode=Mode.PRIVATE)
    add(fillet1_2_piece_4, mode=Mode.SUBTRACT)
    with BuildSketch(Plane(origin=(-14.7, -19.075, 41.5), x_dir=(0, -1, 0), z_dir=(0, 0, 1))) as fillet1_2_piece_5_section:
        with BuildLine():
            CenterArc((FILLET1_R, FILLET1_R), FILLET1_R, 180, 90)
            Line((0, FILLET1_R), (0, 0))
            Line((0, 0), (FILLET1_R, 0))
        make_face()
    fillet1_2_piece_5 = extrude(amount=21, mode=Mode.PRIVATE)
    fillet1_2_piece_5 = split(fillet1_2_piece_5, bisect_by=Plane(origin=(-9.907111196, -19.302897648, 48.792888804), z_dir=(-0.7071067811865476, 0, 0.7071067811865476)), keep=Keep.TOP, mode=Mode.PRIVATE)
    add(fillet1_2_piece_5, mode=Mode.SUBTRACT)

    # Chamfer2
    chamfer2_edges = [part.edges().sort_by_distance(p)[0] for p in [
        (-19.594606781, -21.075, 40),
        (-16.7, -23.075, 0),
        (16.7, -23.075, 0),
        (19.594606781, -21.075, 40),
        (19.594606781, -21.075, 0),
        (0, -48.475, 0),
        (19.075, 0, 0),
        (0, 19.075, 0),
        (-19.075, 0, 0),
        (-21.075, 0, 0),
        (0, 21.075, 0),
        (21.075, 0, 0),
        (12.7, -33.775, 0),
        (0, -21.075, 0),
        (-12.7, -33.775, 0),
        (0, -46.475, 0),
        (-20.782106781, 20.782106781, 0),
        (20.782106781, 20.782106781, 0),
        (20.782106781, -20.782106781, 0),
        (-20.782106781, -20.782106781, 0),
        (-14.407106781, -48.182106781, 0),
        (14.407106781, -48.182106781, 0),
        (-21.075, 0, 40),
        (21.075, 0, 40),
        (0, 21.075, 40),
        (-19.075, 0, 40),
        (0, 19.075, 40),
        (19.075, 0, 40),
        (-20.782106781, 20.782106781, 40),
        (20.782106781, 20.782106781, 40),
        (20.782106781, -20.782106781, 40),
        (-20.782106781, -20.782106781, 40),
        (-18.902293437, -21.09771301, 40),
        (-18.73153013, -21.151120467, 0),
        (-14.776120467, -25.10653013, 0),
        (14.776120467, -25.10653013, 0),
        (18.73153013, -21.151120467, 0),
        (18.902293437, -21.09771301, 40),
        (12.407106781, -46.182106781, 60),
        (12.407106781, -46.182106781, 0),
        (12.407106781, -21.367893219, 60),
        (12.407106781, -21.367893219, 0),
        (-12.407106781, -21.367893219, 60),
        (-12.407106781, -21.367893219, 0),
        (-12.407106781, -46.182106781, 60),
        (-12.407106781, -46.182106781, 0),
        (-18.782106781, -18.782106781, 0),
        (-18.976387819, -18.508012702, 40),
        (-18.782106781, 18.782106781, 0),
        (-18.782106781, 18.782106781, 40),
        (18.782106781, 18.782106781, 0),
        (18.782106781, 18.782106781, 40),
        (18.782106781, -18.782106781, 0),
        (18.976387819, -18.508012702, 40),
        (14.7, -36.482106781, 0),
        (14.7, -33.775, 60),
        (0, -48.475, 60),
        (0, -19.075, 60),
        (-14.7, -33.775, 60),
        (-12.7, -33.775, 60),
        (0, -21.075, 60),
        (12.7, -33.775, 60),
        (0, -46.475, 60),
        (-14.407106781, -48.182106781, 60),
        (14.407106781, -48.182106781, 60),
        (-14.407106781, -19.367893219, 60),
        (14.407106781, -19.367893219, 60),
        (0, -19.075, 0),
        (-14.7, -36.482106781, 0),
        (-19.594606781, -21.075, 0),
    ]]
    chamfer(chamfer2_edges, length=CHAMFER2_SIZE)

    # Sketch6 → Cut-Extrude1 (cut)
    with BuildSketch(Plane(origin=(21.075, 0, 0), x_dir=(0, 0, -1), z_dir=(1, 0, 0))):
        with Locations((-20, 0)):
            Circle(SKETCH6_R)
        with Locations((-30, -33.775)):
            Circle(SKETCH6_R)
    extrude(amount=-CUT_EXTRUDE1_DEPTH, mode=Mode.SUBTRACT)

    # Chamfer3
    chamfer3_edges = [part.edges().sort_by_distance(p)[0] for p in [
        (19.075, 0, 23.25),
        (21.075, 0, 23.25),
        (14.7, -33.775, 33.25),
        (12.7, -33.775, 33.25),
    ]]
    chamfer(chamfer3_edges, length=CHAMFER3_SIZE)


solid = part.part
